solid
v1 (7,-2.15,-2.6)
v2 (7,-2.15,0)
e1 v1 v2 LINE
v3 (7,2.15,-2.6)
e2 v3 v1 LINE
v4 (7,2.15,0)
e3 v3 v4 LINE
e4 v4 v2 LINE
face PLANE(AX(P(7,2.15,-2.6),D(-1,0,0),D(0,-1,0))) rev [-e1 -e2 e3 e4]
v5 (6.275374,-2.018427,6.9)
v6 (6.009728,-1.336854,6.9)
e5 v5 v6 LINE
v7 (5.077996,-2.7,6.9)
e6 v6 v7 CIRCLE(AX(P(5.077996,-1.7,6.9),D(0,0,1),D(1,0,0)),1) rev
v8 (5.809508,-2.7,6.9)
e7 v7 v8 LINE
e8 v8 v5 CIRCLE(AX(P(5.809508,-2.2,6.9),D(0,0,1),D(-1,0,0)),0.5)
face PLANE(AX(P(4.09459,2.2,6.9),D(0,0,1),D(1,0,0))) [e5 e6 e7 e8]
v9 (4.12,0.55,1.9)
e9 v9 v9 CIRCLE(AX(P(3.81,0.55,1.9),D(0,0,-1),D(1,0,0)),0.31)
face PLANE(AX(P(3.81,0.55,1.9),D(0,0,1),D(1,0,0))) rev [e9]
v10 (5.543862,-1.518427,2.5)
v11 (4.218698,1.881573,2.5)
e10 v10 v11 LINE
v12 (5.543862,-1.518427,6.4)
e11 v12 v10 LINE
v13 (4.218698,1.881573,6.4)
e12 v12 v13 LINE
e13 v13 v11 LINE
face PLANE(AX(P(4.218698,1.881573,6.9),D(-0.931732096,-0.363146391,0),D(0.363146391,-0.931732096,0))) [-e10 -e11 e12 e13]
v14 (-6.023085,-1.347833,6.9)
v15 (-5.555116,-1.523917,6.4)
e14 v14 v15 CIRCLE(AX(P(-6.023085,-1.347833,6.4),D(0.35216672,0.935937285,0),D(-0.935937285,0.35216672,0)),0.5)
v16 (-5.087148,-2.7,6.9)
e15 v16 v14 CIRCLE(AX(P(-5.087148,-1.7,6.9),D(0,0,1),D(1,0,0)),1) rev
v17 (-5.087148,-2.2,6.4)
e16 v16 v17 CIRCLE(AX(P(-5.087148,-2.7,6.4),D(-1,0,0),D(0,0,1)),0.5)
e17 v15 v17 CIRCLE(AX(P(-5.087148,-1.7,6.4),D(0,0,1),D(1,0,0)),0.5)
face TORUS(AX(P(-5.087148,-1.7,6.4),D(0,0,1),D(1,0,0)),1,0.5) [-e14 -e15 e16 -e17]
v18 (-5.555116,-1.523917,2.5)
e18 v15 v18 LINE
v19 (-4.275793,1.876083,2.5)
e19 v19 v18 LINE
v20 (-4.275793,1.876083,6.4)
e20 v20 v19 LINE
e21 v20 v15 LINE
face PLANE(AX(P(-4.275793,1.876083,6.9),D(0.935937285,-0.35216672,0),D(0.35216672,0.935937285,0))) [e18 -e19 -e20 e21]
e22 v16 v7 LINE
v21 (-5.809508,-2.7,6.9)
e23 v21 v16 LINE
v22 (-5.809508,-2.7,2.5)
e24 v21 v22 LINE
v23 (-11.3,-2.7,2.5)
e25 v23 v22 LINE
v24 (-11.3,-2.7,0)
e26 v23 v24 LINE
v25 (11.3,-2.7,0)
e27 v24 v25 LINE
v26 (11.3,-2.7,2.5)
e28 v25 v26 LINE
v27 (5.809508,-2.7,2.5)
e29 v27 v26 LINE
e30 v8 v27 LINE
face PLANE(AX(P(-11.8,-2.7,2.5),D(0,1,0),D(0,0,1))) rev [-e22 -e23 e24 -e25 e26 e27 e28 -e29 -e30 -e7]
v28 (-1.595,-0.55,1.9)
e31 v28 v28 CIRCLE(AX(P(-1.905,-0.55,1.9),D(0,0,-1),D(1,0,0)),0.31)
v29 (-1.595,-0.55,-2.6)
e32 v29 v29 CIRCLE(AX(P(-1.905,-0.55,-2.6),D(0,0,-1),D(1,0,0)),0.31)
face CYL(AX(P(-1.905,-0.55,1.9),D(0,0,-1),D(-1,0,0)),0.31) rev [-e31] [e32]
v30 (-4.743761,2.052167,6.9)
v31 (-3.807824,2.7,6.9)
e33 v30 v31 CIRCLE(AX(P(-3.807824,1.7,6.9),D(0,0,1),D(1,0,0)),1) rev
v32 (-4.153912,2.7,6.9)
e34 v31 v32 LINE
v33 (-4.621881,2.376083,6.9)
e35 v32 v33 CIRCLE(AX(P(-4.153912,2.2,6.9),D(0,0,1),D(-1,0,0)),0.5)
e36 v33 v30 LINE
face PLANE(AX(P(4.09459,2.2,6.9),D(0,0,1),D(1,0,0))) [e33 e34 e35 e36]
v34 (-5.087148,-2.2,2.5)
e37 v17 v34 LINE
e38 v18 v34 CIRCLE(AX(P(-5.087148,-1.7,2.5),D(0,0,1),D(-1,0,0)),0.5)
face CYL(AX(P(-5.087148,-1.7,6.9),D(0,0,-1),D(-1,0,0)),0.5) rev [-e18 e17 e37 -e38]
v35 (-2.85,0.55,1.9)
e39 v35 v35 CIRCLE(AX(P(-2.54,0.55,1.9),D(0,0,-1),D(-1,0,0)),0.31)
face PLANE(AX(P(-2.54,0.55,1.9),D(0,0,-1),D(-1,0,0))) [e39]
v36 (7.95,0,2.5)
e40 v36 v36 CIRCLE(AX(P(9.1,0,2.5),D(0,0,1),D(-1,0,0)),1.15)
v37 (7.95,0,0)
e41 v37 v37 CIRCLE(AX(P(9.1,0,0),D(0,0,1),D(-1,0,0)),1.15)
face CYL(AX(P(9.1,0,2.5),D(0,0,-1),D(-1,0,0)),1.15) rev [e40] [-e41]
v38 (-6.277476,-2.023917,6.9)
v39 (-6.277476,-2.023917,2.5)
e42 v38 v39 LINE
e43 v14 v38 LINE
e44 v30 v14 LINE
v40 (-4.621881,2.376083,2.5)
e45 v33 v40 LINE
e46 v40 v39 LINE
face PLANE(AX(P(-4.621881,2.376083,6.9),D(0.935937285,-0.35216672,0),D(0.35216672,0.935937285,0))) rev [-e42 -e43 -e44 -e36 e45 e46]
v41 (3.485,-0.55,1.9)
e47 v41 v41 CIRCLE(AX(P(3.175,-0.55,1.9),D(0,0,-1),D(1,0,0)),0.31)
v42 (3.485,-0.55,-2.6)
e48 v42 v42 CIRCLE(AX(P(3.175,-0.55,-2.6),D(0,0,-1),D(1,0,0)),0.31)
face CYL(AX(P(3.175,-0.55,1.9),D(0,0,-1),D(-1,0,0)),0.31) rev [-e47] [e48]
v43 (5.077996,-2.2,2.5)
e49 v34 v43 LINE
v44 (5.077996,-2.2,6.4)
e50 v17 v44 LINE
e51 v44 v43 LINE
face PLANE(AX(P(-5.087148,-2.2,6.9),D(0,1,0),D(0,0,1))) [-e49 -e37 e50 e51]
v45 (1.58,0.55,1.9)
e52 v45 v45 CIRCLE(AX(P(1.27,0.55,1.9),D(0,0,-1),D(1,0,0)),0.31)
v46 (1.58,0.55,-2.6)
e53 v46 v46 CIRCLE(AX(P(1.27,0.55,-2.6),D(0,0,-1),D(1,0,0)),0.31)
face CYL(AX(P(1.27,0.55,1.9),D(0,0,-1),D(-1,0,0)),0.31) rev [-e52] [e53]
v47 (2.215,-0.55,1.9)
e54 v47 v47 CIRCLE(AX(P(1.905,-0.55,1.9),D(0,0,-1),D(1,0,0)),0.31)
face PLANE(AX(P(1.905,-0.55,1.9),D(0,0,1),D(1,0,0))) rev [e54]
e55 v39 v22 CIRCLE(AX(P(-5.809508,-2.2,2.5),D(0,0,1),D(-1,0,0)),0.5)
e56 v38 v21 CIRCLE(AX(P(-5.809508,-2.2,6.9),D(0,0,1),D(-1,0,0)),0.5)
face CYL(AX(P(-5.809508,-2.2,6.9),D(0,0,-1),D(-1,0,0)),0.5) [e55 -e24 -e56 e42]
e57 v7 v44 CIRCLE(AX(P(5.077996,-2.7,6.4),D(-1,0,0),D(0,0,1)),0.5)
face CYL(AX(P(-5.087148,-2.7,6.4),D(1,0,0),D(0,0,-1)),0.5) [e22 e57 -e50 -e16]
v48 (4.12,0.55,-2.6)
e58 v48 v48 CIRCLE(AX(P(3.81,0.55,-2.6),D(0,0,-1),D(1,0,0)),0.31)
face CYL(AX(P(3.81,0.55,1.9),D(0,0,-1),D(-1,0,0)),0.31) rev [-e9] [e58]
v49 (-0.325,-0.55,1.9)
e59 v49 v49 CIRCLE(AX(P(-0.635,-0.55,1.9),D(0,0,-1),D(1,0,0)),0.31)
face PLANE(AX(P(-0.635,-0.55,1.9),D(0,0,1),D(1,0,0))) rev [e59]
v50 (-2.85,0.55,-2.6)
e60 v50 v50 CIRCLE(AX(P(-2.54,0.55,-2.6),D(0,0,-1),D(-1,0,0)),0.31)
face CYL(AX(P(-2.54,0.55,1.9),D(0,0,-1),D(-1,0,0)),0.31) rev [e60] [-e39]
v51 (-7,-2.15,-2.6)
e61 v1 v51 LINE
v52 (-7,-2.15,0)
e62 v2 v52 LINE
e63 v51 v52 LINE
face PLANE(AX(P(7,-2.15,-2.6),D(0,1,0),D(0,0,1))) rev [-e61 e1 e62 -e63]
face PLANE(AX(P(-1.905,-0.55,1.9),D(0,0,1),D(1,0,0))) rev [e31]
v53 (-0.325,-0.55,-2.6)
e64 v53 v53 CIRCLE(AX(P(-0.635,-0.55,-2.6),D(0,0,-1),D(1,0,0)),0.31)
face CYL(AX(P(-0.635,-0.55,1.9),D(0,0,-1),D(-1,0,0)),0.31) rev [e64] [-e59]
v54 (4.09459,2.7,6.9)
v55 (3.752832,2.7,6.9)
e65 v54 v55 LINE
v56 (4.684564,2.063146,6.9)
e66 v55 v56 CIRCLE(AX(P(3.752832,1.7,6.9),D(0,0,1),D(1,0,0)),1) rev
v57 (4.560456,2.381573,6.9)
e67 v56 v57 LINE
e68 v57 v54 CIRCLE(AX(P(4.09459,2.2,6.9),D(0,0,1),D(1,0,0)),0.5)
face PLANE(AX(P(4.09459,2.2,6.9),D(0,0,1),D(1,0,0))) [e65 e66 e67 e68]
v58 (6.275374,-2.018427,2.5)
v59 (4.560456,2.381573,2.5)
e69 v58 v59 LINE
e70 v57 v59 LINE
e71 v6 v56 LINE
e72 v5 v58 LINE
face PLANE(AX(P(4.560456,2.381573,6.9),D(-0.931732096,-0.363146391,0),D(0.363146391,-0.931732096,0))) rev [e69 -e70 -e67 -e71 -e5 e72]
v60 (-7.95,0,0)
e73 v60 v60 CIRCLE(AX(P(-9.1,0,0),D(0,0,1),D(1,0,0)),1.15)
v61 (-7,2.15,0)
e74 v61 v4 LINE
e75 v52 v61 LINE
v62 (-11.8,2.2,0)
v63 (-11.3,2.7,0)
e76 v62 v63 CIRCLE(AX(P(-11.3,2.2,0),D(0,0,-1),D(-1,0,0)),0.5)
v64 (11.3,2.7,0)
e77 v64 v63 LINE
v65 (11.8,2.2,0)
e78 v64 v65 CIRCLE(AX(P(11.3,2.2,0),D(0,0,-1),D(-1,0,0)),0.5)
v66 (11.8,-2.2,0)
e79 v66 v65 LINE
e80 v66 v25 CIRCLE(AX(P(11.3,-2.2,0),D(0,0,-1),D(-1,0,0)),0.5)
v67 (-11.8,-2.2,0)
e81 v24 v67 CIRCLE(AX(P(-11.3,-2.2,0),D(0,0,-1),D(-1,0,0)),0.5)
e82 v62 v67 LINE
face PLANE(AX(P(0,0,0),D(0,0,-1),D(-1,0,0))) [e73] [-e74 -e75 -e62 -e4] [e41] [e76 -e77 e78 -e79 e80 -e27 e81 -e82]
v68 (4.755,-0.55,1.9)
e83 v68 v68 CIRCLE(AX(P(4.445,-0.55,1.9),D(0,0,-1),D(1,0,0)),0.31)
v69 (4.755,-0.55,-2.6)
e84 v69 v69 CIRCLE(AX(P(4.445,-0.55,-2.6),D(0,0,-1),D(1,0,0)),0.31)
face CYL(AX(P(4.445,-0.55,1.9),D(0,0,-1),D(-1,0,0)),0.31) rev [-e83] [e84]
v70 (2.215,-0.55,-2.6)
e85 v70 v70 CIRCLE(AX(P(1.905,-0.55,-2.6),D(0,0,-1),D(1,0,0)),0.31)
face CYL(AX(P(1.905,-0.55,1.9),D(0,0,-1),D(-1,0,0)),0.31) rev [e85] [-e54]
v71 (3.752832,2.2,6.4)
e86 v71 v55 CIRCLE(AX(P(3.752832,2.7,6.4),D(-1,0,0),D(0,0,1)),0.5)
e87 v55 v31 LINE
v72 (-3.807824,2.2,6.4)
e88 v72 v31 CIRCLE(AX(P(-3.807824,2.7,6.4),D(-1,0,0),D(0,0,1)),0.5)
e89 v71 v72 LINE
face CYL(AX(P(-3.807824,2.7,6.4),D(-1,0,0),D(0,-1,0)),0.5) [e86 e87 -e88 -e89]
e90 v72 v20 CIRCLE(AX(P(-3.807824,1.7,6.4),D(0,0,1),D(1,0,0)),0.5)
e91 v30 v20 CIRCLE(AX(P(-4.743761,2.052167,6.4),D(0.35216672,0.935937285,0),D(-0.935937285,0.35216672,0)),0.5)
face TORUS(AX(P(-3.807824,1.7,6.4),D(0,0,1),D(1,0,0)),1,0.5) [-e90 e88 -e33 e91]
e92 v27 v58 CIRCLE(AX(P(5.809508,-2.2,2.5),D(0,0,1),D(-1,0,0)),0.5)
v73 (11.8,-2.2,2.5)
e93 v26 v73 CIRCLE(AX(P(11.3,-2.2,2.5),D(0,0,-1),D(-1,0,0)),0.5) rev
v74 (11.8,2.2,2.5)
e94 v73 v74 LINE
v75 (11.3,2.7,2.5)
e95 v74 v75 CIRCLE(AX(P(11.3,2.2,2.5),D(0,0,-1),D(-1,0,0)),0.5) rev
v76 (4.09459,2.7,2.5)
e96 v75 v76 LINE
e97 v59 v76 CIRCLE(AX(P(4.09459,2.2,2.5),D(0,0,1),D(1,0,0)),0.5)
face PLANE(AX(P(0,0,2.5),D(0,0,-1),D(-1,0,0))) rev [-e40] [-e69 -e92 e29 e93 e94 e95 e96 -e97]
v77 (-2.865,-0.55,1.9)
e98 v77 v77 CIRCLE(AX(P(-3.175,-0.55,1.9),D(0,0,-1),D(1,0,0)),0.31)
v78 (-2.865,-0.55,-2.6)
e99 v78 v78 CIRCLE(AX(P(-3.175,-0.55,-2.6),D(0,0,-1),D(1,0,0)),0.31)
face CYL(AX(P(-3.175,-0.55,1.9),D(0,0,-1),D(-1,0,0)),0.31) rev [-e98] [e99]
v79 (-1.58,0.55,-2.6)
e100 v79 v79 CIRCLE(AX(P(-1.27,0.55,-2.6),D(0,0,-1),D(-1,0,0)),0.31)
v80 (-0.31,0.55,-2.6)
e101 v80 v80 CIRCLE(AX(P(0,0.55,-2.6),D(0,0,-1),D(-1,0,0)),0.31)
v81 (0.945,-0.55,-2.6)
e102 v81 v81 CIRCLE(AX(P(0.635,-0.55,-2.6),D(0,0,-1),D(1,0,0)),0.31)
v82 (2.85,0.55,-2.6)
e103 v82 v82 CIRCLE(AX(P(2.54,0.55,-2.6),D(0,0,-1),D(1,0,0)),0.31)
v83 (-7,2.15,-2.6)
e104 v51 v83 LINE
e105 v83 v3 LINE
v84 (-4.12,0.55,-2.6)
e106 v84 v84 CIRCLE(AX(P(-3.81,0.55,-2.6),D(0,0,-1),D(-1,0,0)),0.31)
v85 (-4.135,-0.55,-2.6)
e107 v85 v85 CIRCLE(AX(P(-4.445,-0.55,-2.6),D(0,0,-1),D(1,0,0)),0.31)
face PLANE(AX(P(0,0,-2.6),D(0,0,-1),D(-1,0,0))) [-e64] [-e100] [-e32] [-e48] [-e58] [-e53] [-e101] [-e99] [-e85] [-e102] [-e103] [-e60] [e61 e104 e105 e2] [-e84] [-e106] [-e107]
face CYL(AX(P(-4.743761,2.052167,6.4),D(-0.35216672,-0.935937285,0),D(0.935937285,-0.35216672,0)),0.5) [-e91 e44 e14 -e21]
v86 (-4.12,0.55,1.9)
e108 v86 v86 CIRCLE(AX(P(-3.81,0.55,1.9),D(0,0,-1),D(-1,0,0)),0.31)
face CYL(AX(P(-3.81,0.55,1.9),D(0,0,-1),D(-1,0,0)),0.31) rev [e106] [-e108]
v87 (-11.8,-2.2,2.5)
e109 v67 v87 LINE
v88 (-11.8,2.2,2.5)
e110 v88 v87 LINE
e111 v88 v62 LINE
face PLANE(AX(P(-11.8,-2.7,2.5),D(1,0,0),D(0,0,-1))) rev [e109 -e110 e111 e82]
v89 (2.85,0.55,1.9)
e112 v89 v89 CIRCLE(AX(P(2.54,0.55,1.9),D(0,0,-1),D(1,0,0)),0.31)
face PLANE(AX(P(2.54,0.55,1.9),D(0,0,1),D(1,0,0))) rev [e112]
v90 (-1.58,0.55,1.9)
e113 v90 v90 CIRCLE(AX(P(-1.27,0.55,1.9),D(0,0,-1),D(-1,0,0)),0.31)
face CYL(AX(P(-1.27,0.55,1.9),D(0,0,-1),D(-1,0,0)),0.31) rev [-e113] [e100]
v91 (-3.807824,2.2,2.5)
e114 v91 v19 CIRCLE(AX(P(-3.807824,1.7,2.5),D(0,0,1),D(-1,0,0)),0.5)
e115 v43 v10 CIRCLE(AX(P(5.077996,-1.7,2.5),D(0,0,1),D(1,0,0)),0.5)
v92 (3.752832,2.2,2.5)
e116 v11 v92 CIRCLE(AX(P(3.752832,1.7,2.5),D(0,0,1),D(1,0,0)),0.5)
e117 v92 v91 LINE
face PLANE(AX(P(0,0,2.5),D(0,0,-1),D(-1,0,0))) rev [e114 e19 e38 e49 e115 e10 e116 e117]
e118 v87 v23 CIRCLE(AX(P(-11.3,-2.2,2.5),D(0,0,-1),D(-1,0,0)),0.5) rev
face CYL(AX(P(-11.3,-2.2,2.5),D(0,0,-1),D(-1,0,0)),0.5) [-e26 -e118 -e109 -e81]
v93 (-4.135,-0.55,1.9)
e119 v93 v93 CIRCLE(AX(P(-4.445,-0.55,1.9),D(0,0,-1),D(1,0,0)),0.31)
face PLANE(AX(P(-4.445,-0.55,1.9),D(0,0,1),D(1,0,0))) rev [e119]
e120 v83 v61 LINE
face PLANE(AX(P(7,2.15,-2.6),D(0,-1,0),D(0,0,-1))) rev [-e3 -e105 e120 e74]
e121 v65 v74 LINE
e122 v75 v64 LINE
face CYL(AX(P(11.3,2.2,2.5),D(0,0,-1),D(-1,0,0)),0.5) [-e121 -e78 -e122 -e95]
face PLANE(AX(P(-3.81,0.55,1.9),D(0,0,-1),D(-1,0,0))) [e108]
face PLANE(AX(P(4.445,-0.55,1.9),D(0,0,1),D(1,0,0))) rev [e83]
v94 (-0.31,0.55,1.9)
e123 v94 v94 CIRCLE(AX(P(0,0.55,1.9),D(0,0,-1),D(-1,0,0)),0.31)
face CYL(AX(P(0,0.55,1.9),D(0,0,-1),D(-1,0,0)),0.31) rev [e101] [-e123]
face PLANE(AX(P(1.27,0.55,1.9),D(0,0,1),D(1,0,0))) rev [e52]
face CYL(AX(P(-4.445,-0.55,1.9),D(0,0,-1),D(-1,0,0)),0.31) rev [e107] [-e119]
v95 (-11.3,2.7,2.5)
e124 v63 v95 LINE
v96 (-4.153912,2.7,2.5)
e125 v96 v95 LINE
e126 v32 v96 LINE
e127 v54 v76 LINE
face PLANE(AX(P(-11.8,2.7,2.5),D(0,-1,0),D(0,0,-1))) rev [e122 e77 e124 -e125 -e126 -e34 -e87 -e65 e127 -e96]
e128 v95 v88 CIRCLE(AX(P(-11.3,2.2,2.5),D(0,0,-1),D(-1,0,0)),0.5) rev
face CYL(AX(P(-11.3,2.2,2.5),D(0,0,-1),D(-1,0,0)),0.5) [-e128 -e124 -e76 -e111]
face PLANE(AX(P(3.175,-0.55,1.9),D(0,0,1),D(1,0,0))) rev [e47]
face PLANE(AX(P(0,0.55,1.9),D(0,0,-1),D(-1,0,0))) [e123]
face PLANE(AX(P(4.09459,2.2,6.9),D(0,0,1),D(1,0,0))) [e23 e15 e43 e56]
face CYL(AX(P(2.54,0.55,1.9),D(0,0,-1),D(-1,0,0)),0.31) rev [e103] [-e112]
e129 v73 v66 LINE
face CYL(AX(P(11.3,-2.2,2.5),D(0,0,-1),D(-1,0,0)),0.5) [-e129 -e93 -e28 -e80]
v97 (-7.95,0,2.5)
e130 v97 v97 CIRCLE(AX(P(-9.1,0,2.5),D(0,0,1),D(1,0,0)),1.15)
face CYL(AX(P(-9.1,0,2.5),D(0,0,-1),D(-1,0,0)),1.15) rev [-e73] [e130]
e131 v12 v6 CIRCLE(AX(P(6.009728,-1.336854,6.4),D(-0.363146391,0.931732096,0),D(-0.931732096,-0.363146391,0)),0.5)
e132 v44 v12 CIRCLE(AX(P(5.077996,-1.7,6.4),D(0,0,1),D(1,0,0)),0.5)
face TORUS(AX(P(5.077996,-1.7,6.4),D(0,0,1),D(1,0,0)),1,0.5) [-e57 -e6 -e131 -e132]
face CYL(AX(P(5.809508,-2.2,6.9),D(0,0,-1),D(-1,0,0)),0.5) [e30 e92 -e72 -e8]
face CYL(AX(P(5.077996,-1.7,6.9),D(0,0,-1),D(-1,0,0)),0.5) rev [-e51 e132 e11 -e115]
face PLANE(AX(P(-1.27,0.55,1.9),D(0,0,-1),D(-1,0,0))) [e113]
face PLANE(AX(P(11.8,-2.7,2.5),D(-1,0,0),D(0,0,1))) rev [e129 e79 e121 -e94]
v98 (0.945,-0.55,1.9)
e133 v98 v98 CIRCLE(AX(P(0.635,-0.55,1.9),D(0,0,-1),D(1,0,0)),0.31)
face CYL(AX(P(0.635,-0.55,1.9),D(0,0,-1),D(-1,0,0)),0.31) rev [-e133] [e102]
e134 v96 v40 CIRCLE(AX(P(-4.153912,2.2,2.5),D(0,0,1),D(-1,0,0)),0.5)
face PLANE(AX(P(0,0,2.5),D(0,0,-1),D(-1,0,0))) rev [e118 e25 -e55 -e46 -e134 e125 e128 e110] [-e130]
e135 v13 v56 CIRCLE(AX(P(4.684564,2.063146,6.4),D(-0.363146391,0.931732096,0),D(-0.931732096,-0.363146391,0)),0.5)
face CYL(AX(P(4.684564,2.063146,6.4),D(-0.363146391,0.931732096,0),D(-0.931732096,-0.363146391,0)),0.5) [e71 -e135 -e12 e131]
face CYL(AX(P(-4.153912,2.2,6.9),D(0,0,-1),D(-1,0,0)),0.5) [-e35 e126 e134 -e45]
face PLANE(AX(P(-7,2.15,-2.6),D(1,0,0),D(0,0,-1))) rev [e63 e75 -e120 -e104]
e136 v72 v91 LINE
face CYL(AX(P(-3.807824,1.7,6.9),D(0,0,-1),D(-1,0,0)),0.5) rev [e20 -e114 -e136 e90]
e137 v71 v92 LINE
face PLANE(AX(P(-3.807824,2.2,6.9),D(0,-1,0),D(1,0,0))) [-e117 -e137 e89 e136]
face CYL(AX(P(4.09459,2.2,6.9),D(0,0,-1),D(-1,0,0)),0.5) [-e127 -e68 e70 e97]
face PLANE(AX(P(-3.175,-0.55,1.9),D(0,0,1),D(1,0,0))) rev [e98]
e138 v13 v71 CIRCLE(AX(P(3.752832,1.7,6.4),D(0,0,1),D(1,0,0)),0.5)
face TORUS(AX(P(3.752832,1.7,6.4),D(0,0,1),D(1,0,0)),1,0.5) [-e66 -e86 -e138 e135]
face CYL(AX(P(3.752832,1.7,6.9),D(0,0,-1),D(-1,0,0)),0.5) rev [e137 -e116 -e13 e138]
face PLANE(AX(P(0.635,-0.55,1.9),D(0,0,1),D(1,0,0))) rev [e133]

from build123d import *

# Parameters (mm, degrees)
SKETCH_1_W          = 23.6
SKETCH_1_H          = 5.4
SKETCH_1_R          = 1.15
EXTRUDE_1_DEPTH     = 2.5
FILLET_1_R          = 0.5
FILLET_2_R          = 0.5
SKETCH_3_W          = 14
SKETCH_3_H          = 4.3
EXTRUDE_2_DEPTH     = 2.6
SKETCH_4_R          = 0.31
CUT_EXTRUDE_1_DEPTH = 4.5
EXTRUDE_3_DEPTH     = 4.4
FILLET_3_R          = 0.5


with BuildPart() as part:
    # 草图1 → 凸台-拉伸1 (new body)
    with BuildSketch(Plane.XY):
        Rectangle(SKETCH_1_W, SKETCH_1_H)
        with Locations((-9.1, 0)):
            Circle(SKETCH_1_R, mode=Mode.SUBTRACT)
        with Locations(Location((9.1, 0, 0), (0, 0, 180))):
            Circle(SKETCH_1_R, mode=Mode.SUBTRACT)
    extrude(amount=EXTRUDE_1_DEPTH)

    # 圆角1
    fillet_1_edges = [part.edges().sort_by_distance(p)[0] for p in [
        (-11.8, 2.7, 1.25),
    ]]
    fillet(fillet_1_edges, radius=FILLET_1_R)

    # 圆角2
    fillet_2_edges = [part.edges().sort_by_distance(p)[0] for p in [
        (11.8, 2.7, 1.25),
        (11.8, -2.7, 1.25),
        (-11.8, -2.7, 1.25),
    ]]
    fillet(fillet_2_edges, radius=FILLET_2_R)

    # 草图3 → 凸台-拉伸2 (add)
    with BuildSketch(Plane(origin=(0, 0, 0), x_dir=(-1, 0, 0), z_dir=(0, 0, -1))):
        Rectangle(SKETCH_3_W, SKETCH_3_H)
    extrude(amount=EXTRUDE_2_DEPTH)

    # 草图4 → 切除-拉伸1 (cut)
    with BuildSketch(Plane(origin=(0, 0, -2.6), x_dir=(-1, 0, 0), z_dir=(0, 0, -1))):
        with Locations((0, 0.55)):
            Circle(SKETCH_4_R)
        with Locations((1.27, 0.55)):
            Circle(SKETCH_4_R)
        with Locations((2.54, 0.55)):
            Circle(SKETCH_4_R)
        with Locations((3.81, 0.55)):
            Circle(SKETCH_4_R)
        with Locations(Location((-3.81, 0.55, 0), (0, 0, 180))):
            Circle(SKETCH_4_R)
        with Locations(Location((-2.54, 0.55, 0), (0, 0, 180))):
            Circle(SKETCH_4_R)
        with Locations(Location((-1.27, 0.55, 0), (0, 0, 180))):
            Circle(SKETCH_4_R)
        with Locations(Location((-4.445, -0.55, 0), (0, 0, 180))):
            Circle(SKETCH_4_R)
        with Locations(Location((-3.175, -0.55, 0), (0, 0, 180))):
            Circle(SKETCH_4_R)
        with Locations(Location((-1.905, -0.55, 0), (0, 0, 180))):
            Circle(SKETCH_4_R)
        with Locations(Location((-0.635, -0.55, 0), (0, 0, 180))):
            Circle(SKETCH_4_R)
        with Locations(Location((0.635, -0.55, 0), (0, 0, 180))):
            Circle(SKETCH_4_R)
        with Locations(Location((1.905, -0.55, 0), (0, 0, 180))):
            Circle(SKETCH_4_R)
        with Locations(Location((3.175, -0.55, 0), (0, 0, 180))):
            Circle(SKETCH_4_R)
        with Locations(Location((4.445, -0.55, 0), (0, 0, 180))):
            Circle(SKETCH_4_R)
    extrude(amount=-CUT_EXTRUDE_1_DEPTH, mode=Mode.SUBTRACT)

    # 草图5 → 凸台-拉伸3 (add)
    with BuildSketch(Plane.XY.offset(2.5)):
        with BuildLine():
            Line((-4.153912025, 2.7), (4.094589559, 2.7))
            ThreePointArc((4.094589559, 2.7), (4.376736154, 2.612787232), (4.560455607, 2.381573196))
            Line((4.560455607, 2.381573196), (6.275373584, -2.018426804))
            ThreePointArc((6.275373584, -2.018426804), (6.222294768, -2.482146595), (5.809507536, -2.7))
            Line((5.809507536, -2.7), (-5.809507536, -2.7))
            ThreePointArc((-5.809507536, -2.7), (-6.220628978, -2.484568375), (-6.277476178, -2.02391664))
            Line((-6.277476178, -2.02391664), (-4.621880667, 2.37608336))
            ThreePointArc((-4.621880667, 2.37608336), (-4.4384804, 2.611121442), (-4.153912025, 2.7))
        make_face()
        with BuildLine():
            Line((-3.807824049, 2.2), (3.752831659, 2.2))
            ThreePointArc((3.752831659, 2.2), (4.034978254, 2.112787232), (4.218697707, 1.881573196))
            Line((4.218697707, 1.881573196), (5.543861598, -1.518426804))
            ThreePointArc((5.543861598, -1.518426804), (5.490782782, -1.982146595), (5.07799555, -2.2))
            Line((5.07799555, -2.2), (-5.087147854, -2.2))
            ThreePointArc((-5.087147854, -2.2), (-5.498269295, -1.984568375), (-5.555116496, -1.52391664))
            Line((-5.555116496, -1.52391664), (-4.275792692, 1.87608336))
            ThreePointArc((-4.275792692, 1.87608336), (-4.092392424, 2.111121442), (-3.807824049, 2.2))
        make_face(mode=Mode.SUBTRACT)
    extrude(amount=EXTRUDE_3_DEPTH)

    # 圆角3
    fillet_3_edges = [part.edges().sort_by_distance(p)[0] for p in [
        (5.490782782, -1.982146595, 6.9),
        (4.881279653, 0.181573196, 6.9),
        (4.034978254, 2.112787232, 6.9),
        (-0.027496195, 2.2, 6.9),
        (-4.092392424, 2.111121442, 6.9),
        (-4.915454594, 0.17608336, 6.9),
        (-5.498269295, -1.984568375, 6.9),
        (-0.004576152, -2.2, 6.9),
    ]]
    fillet(fillet_3_edges, radius=FILLET_3_R - 0.0001)  # a hair under: the kernel refuses the full size


solid = part.part
